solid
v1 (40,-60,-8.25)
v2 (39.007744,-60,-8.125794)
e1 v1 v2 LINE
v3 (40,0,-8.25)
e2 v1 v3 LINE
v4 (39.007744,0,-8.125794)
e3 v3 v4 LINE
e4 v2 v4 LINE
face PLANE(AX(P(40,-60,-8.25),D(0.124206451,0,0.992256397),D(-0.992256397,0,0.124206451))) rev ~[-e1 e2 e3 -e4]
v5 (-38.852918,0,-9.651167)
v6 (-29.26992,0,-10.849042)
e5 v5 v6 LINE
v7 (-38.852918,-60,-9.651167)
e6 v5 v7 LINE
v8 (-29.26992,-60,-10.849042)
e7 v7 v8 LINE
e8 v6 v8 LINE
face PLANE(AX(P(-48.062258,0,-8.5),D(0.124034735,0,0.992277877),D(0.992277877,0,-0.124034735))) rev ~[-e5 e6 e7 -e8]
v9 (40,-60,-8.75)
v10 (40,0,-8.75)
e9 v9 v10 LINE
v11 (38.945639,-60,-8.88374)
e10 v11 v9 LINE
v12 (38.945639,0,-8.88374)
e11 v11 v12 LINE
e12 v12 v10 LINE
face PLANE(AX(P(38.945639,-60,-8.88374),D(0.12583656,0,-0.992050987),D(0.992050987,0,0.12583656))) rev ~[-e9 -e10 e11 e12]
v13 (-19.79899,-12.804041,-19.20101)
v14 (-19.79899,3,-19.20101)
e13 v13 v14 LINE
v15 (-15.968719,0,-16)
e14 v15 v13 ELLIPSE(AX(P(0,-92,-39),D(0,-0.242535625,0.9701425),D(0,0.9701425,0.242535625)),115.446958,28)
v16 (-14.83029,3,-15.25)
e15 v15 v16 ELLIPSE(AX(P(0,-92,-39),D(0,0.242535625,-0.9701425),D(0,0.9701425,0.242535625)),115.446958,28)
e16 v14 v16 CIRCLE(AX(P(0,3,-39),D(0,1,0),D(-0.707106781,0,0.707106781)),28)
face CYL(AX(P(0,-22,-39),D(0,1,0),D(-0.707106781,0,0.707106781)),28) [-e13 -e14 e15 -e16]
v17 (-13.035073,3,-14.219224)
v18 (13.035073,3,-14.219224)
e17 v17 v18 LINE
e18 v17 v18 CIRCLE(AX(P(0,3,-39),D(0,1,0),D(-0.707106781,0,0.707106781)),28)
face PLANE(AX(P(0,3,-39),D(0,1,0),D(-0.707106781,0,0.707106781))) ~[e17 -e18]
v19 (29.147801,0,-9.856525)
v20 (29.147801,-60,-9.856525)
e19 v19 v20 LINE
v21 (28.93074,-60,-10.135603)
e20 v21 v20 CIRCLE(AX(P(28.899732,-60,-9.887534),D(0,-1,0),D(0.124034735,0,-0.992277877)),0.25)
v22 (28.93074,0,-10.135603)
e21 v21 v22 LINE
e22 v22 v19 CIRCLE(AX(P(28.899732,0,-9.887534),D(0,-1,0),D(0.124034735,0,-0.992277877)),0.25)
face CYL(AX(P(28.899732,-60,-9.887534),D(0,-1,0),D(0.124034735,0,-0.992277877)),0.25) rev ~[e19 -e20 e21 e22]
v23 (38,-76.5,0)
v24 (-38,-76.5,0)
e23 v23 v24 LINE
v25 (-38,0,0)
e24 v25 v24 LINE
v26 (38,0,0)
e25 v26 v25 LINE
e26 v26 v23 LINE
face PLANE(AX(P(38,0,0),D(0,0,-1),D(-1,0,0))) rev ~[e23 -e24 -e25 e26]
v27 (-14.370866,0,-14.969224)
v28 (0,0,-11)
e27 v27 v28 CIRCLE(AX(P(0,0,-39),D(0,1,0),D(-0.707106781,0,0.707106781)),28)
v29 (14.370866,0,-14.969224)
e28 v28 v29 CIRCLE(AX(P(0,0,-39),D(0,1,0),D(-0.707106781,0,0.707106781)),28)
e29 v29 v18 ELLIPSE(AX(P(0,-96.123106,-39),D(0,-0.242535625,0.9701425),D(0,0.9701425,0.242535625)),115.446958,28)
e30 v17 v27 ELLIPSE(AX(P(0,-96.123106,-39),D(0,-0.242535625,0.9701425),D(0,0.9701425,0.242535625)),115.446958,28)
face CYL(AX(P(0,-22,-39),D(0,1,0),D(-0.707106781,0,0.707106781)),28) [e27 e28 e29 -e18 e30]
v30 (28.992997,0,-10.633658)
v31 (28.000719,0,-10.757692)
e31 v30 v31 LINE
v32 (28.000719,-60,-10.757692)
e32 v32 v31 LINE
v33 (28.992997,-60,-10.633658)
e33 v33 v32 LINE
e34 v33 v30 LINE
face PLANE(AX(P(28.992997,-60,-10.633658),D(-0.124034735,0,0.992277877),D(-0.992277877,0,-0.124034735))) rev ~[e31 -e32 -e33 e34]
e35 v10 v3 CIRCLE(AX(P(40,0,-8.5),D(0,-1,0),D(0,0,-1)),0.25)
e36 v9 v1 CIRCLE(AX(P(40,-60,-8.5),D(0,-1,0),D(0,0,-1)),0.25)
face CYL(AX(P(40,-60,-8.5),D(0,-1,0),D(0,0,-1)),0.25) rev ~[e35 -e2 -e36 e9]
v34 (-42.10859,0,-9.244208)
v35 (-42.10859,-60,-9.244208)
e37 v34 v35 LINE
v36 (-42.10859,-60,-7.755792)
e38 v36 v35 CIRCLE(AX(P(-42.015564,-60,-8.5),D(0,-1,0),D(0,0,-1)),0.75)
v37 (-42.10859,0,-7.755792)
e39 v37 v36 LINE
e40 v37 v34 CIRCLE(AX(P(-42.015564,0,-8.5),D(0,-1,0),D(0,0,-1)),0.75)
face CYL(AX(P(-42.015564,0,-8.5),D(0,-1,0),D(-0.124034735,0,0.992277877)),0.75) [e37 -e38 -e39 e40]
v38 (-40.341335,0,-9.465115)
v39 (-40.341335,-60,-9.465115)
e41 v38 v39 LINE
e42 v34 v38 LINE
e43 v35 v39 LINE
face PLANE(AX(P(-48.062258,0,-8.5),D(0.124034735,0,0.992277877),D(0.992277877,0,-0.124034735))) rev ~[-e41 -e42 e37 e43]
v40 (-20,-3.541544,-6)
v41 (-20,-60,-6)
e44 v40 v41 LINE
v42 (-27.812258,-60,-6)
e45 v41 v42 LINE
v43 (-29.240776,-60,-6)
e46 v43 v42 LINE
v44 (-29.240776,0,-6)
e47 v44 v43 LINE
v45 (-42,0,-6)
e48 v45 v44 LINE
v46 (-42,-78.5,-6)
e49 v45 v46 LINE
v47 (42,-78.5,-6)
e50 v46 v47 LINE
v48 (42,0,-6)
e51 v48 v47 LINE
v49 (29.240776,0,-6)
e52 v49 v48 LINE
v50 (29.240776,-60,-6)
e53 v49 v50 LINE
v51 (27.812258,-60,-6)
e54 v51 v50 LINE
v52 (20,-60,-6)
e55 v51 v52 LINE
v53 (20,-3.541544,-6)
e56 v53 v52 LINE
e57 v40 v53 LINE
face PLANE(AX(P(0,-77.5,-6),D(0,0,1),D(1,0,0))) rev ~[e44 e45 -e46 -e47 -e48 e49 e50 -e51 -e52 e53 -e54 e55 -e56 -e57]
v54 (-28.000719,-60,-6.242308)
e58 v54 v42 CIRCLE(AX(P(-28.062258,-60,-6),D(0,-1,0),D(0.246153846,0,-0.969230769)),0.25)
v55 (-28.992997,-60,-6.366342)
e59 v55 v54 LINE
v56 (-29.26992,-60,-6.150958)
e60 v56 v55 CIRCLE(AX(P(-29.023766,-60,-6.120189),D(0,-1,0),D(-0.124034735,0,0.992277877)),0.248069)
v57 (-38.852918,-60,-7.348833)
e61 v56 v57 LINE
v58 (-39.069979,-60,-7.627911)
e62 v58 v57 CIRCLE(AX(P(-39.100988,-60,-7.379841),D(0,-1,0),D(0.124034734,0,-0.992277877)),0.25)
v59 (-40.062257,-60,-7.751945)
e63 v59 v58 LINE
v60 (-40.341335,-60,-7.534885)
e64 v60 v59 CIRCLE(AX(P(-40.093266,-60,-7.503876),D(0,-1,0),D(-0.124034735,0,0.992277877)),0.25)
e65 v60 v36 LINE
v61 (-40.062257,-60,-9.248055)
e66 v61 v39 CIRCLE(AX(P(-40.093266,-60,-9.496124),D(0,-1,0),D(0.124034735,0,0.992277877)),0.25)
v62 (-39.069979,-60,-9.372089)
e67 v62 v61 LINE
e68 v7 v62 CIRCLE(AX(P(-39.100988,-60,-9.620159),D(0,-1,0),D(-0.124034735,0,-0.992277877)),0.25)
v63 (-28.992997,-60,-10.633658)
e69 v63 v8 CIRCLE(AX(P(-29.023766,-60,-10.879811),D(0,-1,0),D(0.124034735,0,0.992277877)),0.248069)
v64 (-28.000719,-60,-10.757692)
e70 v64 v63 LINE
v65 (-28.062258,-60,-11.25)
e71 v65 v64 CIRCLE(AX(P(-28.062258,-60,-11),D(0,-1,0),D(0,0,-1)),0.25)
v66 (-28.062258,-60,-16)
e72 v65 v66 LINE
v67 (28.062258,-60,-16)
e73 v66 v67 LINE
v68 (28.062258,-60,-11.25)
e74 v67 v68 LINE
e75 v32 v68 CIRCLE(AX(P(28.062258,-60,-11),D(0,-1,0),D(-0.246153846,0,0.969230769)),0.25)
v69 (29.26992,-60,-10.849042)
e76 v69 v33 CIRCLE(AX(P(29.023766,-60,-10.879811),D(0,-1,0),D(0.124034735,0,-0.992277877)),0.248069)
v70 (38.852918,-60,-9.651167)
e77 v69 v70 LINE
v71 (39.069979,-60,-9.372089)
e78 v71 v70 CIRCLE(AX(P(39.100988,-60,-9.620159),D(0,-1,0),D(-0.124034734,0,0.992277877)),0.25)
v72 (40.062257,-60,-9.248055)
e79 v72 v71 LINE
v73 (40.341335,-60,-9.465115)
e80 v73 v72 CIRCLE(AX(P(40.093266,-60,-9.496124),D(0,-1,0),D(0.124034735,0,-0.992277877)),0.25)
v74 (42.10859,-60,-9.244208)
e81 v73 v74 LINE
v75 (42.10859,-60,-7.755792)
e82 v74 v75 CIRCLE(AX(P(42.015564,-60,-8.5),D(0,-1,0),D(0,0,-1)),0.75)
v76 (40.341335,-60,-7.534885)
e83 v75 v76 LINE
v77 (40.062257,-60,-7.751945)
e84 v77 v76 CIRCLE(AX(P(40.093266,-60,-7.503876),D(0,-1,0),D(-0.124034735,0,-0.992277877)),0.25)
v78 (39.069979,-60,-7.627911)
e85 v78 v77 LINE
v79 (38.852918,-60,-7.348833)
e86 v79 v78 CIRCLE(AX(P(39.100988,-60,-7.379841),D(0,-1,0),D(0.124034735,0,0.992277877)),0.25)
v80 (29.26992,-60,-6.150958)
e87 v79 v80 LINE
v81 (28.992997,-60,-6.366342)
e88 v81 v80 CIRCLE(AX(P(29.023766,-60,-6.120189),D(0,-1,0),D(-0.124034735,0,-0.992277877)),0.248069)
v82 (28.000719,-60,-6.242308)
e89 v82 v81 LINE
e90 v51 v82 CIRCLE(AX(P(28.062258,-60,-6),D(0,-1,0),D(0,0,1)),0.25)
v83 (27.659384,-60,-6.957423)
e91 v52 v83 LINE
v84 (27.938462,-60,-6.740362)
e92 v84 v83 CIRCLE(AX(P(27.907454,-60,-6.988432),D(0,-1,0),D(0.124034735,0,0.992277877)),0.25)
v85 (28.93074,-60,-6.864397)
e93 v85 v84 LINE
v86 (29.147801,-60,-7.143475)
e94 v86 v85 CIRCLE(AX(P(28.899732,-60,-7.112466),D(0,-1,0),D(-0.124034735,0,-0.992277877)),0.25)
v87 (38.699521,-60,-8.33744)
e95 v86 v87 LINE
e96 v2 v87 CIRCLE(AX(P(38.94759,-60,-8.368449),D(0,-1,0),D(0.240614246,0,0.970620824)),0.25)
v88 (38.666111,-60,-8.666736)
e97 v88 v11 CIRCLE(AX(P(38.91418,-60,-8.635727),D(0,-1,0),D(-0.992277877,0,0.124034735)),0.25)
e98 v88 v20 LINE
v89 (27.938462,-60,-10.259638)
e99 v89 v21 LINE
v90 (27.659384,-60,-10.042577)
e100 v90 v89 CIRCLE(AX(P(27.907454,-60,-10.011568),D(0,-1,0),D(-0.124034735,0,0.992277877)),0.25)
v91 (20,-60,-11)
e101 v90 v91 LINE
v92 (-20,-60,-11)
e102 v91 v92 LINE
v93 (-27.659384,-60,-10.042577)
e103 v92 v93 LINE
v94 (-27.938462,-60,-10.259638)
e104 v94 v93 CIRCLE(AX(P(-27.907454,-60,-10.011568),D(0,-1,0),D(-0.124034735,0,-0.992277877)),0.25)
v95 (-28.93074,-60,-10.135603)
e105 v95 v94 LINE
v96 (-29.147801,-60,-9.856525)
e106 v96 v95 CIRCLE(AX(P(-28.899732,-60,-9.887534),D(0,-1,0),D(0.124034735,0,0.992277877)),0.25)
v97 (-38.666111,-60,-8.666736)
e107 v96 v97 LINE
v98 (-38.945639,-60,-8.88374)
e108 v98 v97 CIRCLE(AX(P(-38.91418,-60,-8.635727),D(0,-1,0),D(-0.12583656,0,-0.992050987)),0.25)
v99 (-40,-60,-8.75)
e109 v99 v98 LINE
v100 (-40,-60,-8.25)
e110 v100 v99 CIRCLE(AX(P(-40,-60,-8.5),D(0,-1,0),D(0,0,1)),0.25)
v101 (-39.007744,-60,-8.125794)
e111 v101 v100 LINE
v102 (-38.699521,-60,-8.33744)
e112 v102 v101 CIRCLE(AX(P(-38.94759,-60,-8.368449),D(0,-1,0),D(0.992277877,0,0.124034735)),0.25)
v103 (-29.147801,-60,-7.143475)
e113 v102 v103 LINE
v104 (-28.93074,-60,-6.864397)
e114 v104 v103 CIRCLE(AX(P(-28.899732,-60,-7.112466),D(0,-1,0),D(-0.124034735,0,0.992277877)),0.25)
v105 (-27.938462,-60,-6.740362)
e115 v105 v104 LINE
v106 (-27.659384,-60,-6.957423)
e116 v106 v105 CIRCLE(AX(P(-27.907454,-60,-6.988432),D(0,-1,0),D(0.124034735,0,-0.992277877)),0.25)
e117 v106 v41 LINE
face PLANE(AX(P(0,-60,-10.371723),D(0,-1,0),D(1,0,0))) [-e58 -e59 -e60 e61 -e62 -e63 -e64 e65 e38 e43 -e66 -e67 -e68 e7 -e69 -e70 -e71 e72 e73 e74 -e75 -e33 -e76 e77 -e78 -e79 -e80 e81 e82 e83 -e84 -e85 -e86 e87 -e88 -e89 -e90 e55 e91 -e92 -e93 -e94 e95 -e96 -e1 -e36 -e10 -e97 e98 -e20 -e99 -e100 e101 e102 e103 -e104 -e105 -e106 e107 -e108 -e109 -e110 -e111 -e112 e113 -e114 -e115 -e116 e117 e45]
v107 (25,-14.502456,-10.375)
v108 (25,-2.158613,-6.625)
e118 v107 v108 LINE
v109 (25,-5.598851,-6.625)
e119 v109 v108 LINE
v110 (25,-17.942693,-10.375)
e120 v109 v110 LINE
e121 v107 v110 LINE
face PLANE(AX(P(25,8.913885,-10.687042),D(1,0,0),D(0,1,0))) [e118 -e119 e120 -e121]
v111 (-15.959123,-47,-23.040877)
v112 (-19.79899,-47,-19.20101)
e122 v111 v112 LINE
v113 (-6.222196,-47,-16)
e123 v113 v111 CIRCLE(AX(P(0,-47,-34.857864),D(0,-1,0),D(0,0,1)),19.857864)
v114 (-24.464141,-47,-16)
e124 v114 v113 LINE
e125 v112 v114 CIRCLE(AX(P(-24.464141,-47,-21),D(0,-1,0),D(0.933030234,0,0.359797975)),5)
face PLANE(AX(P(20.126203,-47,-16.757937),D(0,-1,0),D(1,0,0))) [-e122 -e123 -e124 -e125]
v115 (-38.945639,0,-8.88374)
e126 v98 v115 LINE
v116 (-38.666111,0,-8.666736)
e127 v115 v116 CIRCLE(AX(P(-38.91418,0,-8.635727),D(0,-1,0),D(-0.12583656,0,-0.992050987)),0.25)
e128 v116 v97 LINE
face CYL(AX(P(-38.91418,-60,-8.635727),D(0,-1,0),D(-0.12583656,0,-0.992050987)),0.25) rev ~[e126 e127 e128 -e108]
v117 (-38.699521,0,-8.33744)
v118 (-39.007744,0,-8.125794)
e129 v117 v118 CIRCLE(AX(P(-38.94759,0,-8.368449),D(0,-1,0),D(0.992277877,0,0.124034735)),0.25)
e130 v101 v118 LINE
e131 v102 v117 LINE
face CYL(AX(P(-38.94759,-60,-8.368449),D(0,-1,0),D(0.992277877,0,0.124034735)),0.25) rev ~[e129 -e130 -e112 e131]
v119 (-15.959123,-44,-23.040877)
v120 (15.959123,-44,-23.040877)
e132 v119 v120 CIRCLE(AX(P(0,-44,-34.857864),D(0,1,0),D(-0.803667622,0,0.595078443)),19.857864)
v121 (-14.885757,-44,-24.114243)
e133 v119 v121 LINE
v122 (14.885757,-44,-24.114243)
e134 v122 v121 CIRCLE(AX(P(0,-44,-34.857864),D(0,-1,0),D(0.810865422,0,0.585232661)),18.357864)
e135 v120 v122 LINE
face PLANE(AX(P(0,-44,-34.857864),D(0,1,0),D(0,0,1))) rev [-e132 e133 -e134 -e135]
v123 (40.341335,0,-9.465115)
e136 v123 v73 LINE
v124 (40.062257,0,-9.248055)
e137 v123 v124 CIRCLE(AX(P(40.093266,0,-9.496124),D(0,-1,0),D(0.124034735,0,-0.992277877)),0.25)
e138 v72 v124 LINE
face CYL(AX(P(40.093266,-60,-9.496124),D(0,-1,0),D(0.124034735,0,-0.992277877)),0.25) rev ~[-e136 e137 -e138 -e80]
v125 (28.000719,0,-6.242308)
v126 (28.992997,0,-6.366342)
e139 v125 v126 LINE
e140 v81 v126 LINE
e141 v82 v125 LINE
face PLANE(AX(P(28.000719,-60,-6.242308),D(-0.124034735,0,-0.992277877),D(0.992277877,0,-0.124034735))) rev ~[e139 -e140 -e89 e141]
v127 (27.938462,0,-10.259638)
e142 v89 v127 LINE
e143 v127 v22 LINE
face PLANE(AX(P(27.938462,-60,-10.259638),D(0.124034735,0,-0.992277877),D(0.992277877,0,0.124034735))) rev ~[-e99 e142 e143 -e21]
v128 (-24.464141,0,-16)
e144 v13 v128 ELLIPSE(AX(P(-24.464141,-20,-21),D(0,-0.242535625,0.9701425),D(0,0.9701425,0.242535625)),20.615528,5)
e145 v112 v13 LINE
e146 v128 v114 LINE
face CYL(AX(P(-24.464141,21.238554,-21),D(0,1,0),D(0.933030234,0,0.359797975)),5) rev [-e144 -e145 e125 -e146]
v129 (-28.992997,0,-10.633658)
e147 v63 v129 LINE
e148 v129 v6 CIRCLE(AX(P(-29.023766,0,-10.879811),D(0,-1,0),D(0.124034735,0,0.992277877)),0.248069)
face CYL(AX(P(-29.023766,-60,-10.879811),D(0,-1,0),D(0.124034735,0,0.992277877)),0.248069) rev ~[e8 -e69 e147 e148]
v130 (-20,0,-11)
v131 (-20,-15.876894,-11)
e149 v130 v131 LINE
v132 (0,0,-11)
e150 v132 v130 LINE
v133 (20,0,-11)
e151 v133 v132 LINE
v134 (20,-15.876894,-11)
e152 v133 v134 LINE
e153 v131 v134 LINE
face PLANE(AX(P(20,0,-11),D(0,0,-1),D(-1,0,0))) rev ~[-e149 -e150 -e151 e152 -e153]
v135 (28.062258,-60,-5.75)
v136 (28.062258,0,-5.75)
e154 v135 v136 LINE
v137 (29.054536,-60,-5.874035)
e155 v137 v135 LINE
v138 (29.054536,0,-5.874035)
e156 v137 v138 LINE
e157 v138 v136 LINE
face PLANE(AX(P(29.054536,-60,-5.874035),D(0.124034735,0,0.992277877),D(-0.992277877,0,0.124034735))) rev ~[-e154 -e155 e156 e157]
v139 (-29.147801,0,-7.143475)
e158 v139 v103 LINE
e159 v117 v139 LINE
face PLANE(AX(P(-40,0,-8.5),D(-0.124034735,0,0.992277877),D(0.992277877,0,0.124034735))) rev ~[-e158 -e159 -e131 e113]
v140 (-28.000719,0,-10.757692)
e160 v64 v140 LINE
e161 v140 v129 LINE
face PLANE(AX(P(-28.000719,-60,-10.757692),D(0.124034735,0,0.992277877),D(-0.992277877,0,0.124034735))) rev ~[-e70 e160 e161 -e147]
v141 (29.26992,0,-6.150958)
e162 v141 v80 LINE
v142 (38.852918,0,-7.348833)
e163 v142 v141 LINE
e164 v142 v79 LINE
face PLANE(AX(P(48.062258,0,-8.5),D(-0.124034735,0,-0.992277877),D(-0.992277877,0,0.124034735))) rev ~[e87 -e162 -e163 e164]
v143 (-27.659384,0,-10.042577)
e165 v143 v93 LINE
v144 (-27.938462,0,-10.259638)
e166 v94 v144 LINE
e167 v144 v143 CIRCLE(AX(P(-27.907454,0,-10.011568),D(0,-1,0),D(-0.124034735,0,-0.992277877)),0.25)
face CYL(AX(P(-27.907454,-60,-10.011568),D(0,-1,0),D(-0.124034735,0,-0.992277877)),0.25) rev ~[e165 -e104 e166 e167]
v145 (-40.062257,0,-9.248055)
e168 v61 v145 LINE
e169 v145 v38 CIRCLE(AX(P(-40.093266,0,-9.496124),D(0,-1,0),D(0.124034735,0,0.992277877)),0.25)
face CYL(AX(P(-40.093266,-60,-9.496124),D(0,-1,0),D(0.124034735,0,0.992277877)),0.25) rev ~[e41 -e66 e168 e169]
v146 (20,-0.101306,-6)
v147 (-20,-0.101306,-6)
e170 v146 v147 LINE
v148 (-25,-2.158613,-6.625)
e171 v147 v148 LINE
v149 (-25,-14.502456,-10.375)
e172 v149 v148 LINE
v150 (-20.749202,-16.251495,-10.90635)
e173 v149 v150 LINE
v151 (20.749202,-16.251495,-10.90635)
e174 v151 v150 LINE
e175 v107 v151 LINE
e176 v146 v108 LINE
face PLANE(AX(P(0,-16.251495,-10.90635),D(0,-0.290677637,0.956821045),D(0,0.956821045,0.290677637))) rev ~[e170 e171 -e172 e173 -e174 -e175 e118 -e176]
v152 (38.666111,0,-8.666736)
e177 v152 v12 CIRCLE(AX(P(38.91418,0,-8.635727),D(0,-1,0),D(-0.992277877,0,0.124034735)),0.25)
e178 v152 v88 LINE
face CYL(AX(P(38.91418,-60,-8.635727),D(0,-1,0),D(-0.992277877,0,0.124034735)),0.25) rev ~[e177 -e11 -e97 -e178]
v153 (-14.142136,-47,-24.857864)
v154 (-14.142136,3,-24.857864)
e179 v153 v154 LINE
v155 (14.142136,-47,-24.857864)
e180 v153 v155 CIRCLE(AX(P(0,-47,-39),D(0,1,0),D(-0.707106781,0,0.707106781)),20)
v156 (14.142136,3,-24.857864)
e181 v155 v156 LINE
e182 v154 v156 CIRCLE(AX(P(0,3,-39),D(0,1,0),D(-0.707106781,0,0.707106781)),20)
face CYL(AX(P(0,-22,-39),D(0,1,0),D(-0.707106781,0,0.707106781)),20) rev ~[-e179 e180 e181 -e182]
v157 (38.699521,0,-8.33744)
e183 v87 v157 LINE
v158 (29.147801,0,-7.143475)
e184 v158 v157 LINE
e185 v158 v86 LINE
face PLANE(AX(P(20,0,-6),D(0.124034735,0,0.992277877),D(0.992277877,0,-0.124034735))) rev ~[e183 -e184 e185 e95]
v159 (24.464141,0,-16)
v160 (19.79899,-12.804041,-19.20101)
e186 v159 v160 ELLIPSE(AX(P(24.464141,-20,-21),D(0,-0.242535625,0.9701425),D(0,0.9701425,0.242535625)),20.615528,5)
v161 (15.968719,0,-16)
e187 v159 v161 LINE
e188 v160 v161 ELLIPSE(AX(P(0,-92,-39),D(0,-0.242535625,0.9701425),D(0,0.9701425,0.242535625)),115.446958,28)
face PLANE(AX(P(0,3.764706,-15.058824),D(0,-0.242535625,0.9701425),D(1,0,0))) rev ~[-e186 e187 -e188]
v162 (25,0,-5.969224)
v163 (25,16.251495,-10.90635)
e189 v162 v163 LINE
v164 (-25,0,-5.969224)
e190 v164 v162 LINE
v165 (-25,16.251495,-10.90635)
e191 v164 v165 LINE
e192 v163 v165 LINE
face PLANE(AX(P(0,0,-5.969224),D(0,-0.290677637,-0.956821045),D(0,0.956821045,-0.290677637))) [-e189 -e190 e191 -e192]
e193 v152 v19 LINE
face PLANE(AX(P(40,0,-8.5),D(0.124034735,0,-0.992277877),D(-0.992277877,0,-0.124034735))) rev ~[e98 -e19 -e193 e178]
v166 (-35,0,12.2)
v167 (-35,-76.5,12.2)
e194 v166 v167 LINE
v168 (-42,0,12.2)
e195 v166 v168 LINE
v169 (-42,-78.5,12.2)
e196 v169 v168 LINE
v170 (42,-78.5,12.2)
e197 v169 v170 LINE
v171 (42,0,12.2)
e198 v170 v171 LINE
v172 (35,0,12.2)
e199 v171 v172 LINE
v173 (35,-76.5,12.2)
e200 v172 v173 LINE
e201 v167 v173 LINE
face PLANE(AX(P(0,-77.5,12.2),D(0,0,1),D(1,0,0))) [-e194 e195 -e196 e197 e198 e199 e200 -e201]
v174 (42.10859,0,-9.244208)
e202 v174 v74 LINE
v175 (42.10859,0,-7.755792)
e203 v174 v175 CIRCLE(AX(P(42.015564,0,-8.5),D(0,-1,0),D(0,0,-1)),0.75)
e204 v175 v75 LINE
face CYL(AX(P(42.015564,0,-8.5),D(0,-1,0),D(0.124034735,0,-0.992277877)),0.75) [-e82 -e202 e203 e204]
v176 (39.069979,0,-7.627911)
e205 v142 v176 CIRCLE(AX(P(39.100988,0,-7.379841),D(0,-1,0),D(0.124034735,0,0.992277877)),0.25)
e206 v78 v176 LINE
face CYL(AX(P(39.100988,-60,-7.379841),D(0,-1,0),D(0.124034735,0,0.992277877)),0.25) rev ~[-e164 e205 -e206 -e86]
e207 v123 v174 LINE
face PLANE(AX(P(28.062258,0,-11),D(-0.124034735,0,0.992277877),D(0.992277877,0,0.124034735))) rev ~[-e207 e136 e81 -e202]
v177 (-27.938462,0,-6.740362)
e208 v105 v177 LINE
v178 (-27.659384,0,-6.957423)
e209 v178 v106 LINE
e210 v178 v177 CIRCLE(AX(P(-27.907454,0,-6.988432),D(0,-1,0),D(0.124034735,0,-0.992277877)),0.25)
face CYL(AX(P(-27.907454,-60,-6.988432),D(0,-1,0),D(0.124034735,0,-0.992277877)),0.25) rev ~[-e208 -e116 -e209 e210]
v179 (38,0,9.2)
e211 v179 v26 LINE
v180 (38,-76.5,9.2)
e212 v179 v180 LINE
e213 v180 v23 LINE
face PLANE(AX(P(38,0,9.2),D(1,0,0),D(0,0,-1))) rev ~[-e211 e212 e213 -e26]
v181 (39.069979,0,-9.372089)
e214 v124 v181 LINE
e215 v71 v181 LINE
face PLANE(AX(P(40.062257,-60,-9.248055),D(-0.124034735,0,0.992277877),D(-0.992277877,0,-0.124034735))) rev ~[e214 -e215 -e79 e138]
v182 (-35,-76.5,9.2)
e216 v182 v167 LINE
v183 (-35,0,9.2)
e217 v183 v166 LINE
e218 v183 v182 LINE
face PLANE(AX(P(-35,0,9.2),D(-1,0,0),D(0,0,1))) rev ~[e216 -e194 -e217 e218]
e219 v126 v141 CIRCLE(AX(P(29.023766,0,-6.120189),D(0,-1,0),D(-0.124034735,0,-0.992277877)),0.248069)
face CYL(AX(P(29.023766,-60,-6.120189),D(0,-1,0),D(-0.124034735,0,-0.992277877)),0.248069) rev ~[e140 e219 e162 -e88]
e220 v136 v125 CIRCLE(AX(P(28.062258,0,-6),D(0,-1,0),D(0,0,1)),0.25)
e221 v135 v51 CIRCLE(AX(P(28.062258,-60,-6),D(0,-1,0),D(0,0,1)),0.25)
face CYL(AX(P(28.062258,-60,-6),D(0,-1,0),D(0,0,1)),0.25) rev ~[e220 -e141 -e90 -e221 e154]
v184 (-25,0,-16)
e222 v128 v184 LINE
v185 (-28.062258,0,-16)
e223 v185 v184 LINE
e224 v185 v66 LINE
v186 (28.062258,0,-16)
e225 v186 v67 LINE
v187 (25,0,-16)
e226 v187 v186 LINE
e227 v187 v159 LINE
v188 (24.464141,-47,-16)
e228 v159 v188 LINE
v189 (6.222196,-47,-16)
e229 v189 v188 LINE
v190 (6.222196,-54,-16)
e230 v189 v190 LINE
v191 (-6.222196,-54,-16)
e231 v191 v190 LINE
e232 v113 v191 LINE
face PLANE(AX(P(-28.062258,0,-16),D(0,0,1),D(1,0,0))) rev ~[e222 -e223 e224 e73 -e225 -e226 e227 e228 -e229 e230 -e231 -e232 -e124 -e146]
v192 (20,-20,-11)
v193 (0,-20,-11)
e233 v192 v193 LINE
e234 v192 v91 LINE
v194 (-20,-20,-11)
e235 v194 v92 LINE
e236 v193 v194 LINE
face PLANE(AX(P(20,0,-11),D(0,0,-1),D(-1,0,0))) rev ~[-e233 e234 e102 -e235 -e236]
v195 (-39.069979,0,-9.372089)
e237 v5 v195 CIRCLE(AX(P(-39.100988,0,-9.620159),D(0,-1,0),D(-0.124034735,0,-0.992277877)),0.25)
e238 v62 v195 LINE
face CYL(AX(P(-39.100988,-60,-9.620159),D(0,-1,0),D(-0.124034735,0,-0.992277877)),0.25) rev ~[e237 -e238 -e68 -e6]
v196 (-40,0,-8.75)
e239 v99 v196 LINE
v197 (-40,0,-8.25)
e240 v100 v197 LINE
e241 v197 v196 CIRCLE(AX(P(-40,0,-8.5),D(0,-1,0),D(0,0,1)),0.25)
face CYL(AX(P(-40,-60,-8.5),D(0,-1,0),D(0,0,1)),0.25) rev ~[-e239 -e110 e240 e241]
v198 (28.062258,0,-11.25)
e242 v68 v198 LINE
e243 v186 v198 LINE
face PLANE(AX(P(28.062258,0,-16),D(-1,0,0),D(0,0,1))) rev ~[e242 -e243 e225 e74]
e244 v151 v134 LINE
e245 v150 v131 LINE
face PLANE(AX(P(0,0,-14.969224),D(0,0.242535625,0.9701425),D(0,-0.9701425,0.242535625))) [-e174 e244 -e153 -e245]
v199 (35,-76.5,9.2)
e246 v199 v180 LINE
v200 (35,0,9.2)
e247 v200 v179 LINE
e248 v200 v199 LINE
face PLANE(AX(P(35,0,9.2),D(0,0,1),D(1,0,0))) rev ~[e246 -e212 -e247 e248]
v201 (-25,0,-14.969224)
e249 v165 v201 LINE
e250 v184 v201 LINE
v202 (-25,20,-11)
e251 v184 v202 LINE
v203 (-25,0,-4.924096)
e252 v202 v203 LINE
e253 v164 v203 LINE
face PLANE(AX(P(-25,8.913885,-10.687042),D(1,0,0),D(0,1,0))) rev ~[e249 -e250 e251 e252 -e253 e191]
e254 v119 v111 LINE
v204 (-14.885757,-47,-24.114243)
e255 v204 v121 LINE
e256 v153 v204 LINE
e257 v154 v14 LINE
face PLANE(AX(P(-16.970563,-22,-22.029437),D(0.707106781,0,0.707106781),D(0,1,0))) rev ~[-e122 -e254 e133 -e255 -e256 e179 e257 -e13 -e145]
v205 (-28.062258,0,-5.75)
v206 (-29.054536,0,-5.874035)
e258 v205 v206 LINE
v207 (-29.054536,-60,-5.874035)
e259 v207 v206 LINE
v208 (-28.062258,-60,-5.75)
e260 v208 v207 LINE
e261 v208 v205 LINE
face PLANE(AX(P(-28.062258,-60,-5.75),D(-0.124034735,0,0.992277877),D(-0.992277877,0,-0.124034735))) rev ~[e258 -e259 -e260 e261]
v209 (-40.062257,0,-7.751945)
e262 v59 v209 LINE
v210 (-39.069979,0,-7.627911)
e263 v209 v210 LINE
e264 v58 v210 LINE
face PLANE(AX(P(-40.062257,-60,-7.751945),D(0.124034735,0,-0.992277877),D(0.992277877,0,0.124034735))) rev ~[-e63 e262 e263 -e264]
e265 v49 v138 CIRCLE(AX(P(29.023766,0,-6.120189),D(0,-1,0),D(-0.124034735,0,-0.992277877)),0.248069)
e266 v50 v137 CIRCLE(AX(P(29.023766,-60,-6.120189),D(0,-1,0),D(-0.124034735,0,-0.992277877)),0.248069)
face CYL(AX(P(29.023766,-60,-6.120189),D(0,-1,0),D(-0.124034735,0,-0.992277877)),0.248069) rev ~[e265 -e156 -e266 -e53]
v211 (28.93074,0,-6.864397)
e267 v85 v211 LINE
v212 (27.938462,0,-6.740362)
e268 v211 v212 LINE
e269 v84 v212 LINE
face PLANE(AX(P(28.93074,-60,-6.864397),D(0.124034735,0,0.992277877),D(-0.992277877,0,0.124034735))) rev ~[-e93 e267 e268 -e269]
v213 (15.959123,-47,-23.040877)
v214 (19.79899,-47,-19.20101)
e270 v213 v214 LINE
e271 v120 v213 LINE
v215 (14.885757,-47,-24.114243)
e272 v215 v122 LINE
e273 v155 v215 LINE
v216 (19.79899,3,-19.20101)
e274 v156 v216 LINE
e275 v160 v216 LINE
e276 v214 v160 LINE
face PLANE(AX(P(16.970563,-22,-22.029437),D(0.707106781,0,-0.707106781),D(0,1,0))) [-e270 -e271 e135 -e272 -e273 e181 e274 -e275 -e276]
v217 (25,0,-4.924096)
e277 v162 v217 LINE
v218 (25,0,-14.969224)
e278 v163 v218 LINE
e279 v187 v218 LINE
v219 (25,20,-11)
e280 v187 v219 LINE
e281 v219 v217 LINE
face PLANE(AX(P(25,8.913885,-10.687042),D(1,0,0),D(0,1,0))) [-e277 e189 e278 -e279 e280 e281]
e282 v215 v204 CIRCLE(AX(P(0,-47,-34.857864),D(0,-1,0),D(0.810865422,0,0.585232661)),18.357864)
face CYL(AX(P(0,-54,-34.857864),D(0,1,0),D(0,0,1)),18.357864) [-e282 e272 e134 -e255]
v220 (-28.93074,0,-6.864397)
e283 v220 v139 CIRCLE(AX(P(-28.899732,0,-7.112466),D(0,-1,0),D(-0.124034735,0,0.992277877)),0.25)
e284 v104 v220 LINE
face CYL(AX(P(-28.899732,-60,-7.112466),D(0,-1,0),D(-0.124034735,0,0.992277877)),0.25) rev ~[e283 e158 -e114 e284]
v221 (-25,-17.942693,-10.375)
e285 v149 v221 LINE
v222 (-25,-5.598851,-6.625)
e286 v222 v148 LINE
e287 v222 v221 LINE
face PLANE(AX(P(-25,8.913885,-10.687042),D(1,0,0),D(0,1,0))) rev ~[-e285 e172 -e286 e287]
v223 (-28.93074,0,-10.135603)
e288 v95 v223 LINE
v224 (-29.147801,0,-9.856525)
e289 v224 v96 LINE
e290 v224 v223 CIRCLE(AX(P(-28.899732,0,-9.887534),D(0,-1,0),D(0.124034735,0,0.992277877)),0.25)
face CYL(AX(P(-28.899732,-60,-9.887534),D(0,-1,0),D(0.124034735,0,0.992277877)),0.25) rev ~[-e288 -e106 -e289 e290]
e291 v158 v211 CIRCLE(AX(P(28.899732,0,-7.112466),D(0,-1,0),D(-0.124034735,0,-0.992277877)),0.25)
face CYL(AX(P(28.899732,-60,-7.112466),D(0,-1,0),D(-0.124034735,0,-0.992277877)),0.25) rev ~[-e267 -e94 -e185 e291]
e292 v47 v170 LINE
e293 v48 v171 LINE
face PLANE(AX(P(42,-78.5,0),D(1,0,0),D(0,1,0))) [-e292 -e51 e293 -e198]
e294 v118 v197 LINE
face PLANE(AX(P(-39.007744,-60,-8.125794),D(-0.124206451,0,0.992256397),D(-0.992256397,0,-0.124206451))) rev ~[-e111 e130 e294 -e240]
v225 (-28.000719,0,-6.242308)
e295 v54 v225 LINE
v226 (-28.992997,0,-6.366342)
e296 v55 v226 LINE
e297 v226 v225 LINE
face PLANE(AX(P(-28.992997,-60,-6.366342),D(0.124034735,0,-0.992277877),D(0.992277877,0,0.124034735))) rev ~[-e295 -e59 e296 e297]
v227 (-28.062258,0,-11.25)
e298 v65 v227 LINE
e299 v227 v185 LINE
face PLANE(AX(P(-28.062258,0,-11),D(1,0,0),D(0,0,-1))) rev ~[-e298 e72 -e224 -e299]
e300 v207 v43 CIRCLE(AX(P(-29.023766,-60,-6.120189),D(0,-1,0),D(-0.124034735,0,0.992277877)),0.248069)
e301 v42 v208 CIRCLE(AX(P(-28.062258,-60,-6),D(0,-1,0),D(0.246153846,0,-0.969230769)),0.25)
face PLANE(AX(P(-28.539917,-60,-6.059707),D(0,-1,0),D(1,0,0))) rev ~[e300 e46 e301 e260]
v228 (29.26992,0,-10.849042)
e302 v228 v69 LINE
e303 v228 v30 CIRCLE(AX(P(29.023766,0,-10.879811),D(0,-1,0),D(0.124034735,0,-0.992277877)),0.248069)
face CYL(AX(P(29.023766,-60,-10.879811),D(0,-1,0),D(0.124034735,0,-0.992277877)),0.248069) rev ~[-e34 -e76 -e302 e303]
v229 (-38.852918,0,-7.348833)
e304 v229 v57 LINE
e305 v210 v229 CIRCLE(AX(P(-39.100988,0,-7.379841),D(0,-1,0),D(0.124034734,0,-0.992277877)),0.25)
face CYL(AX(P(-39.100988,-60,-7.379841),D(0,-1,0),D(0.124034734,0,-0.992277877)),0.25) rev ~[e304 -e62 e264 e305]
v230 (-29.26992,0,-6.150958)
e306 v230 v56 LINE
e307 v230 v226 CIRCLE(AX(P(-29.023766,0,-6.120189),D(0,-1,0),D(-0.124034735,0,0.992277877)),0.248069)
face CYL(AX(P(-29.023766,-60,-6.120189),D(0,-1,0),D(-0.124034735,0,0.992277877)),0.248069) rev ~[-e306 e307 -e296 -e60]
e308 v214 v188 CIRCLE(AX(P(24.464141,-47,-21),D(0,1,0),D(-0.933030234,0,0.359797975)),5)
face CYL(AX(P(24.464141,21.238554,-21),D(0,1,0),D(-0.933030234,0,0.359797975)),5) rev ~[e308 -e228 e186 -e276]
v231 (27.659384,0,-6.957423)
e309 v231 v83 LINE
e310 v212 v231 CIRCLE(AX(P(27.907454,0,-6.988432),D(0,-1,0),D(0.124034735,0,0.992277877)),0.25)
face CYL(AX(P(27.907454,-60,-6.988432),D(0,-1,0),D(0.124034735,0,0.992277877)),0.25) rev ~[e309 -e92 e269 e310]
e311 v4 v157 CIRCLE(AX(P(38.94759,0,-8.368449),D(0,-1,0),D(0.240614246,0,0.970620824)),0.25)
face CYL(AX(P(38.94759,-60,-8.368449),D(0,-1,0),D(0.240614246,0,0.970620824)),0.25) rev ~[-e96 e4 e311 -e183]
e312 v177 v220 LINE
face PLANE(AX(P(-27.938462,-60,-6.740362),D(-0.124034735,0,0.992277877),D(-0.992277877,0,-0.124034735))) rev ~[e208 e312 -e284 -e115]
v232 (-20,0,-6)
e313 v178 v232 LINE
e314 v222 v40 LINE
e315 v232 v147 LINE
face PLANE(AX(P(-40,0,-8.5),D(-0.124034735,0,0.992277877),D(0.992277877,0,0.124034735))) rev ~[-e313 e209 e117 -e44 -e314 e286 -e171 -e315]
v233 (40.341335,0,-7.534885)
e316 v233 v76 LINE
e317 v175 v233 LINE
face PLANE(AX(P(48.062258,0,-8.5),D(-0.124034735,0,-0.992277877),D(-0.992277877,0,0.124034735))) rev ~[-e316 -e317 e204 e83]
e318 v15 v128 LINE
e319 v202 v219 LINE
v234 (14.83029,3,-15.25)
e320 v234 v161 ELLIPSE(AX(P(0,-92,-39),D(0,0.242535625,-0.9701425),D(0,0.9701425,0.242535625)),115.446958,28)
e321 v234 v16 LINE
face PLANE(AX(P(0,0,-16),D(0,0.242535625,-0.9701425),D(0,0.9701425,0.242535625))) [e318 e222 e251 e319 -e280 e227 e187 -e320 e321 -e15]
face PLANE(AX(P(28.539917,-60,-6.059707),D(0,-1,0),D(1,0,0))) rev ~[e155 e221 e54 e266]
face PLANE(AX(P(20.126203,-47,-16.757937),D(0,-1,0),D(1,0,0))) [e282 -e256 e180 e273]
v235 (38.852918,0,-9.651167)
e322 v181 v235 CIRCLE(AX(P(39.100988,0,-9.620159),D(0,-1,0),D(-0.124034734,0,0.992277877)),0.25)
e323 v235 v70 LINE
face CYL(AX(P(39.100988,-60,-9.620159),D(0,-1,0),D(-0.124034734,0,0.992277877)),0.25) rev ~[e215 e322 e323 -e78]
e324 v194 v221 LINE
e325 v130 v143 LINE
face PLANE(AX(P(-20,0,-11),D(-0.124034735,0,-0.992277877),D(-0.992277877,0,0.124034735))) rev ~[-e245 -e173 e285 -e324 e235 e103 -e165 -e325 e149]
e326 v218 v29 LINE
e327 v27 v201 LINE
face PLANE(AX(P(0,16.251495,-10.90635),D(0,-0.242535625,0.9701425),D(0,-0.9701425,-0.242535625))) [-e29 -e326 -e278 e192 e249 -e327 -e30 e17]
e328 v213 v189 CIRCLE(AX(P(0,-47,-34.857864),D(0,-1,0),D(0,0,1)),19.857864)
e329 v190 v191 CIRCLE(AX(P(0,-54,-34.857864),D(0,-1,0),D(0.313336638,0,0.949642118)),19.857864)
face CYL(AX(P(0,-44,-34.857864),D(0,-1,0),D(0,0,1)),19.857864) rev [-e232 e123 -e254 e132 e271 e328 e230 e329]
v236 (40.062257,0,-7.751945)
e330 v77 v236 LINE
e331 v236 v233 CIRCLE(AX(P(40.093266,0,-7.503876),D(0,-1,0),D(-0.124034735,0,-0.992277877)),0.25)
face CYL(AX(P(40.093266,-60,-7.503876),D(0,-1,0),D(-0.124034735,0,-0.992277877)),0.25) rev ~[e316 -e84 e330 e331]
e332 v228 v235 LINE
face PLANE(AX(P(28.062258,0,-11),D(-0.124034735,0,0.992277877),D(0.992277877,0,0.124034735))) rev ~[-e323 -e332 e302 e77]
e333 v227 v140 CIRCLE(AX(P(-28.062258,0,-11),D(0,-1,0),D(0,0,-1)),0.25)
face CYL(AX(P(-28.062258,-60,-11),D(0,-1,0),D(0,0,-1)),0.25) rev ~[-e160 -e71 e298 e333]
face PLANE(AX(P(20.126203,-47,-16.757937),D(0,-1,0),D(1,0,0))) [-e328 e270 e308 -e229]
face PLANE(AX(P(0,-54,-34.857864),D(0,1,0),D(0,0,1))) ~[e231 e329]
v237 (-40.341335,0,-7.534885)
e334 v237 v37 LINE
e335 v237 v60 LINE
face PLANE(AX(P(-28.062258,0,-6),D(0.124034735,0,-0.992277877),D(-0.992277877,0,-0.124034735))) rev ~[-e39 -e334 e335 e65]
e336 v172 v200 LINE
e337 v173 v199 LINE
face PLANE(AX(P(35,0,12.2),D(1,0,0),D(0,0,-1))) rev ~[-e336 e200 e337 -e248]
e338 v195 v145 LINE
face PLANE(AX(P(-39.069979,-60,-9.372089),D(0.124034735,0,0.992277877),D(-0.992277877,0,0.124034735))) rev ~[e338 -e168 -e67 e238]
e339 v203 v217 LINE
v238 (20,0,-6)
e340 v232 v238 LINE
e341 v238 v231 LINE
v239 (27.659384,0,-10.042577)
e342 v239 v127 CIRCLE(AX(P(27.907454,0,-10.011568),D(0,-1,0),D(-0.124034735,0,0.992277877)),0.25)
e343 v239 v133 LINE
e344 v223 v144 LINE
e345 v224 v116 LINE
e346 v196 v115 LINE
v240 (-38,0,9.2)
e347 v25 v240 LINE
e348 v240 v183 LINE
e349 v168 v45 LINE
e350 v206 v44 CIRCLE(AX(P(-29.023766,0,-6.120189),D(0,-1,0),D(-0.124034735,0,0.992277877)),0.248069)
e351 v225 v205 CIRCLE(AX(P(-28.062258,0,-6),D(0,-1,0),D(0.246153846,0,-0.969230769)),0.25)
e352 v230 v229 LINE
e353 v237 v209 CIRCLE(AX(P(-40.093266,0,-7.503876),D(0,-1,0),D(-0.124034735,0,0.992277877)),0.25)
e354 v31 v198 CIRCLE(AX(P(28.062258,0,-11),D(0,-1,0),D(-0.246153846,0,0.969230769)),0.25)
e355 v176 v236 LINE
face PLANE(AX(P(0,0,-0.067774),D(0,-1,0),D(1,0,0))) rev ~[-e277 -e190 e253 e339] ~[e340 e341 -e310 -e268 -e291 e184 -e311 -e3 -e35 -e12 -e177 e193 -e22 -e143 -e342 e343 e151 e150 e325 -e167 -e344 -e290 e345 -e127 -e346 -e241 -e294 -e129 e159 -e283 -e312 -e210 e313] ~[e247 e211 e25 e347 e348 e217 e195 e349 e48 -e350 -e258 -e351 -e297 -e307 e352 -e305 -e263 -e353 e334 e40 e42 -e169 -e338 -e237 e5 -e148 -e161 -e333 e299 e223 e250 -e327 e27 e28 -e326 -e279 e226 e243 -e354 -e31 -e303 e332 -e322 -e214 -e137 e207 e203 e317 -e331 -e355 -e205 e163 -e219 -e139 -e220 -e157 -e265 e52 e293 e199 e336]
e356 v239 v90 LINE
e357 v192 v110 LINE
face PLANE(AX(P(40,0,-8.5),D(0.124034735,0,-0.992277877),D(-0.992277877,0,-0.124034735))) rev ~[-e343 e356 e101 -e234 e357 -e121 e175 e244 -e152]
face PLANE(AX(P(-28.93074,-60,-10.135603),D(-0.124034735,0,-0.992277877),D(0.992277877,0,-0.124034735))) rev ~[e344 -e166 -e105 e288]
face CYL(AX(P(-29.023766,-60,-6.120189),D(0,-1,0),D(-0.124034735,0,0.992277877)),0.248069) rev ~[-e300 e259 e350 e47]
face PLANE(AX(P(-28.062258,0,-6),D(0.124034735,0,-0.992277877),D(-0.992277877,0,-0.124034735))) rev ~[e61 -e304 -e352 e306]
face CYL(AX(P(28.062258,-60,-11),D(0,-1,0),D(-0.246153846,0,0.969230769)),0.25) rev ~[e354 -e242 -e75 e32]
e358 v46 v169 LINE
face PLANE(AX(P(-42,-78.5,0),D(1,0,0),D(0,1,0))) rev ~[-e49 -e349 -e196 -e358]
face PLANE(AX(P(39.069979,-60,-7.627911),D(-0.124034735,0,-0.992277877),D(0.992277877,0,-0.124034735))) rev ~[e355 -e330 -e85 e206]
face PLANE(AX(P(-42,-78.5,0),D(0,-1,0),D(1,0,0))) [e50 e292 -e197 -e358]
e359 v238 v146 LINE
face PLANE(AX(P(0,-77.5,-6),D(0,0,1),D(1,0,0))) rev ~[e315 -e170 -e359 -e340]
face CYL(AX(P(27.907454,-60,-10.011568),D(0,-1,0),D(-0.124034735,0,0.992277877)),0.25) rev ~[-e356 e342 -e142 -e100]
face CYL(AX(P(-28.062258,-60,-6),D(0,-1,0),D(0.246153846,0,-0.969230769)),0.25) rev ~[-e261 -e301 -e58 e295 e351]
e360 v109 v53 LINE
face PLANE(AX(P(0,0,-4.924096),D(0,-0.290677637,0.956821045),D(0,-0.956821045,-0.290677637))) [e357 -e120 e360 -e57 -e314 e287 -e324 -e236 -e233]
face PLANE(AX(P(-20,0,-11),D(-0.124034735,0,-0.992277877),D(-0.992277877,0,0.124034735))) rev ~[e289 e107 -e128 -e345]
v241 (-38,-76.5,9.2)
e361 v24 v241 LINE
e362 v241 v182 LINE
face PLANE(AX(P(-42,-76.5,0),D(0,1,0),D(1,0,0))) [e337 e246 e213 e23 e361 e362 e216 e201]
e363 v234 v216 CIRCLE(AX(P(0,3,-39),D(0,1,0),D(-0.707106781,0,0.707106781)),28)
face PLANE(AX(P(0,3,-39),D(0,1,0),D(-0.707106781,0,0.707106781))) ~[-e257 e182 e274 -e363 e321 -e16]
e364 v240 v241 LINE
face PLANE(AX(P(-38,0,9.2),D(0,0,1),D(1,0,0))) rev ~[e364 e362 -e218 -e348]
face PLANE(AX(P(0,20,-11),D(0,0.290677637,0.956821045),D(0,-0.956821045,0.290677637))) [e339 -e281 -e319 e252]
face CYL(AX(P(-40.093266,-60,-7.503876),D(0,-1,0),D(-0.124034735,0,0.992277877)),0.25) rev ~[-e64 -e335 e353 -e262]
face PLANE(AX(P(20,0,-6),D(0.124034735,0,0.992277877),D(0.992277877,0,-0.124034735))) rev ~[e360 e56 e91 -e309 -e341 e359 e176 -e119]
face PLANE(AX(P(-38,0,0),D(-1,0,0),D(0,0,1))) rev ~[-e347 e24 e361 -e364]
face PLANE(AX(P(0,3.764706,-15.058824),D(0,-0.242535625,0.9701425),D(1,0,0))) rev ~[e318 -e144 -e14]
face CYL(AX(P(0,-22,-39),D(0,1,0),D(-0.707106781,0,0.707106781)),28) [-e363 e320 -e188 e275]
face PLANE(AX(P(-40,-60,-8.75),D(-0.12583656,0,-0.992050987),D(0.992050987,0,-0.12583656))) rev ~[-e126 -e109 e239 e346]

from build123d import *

# Parameters (mm, degrees)
F1_DEPTH      = 76.5
F3_DEPTH      = 60
F4_W          = 84
F4_H          = 2
F5_DEPTH      = 12.2
F5_DEPTH_BACK = 6
F7_DEPTH      = 25
F7_DEPTH_BACK = 25
F8_W          = 50
F8_H          = 8
F9_ANGLE_BACK = 45
F9_ANGLE      = 90
F10_T4_DEPTH  = 68.2385540506
F10_T9_DEPTH  = 68.2385540506
F11_W         = 5
F11_H         = 1.5
F14_DEPTH     = 60
F15_F1_R      = 0.75
F15_F2_R      = 0.75


# Not quite as in the source:
# - a fillet or chamfer that OpenCascade refuses, or shapes differently, is made with other operations: its cross-section is extruded or revolved along the edge and cut away or added


with BuildPart() as f1:
    # F0 (on Front) → F1 (new body)
    with BuildSketch(Plane.XZ):
        Polygon((-35, 9.2), (-35, 12.2), (-42, 12.2), (-42, -6), (0, -6), (42, -6), (42, 12.2), (35, 12.2), (35, 9.2), (38, 9.2), (38, 0), (0, 0), (-38, 0), (-38, 9.2), align=None)
    extrude(amount=F1_DEPTH)

    # F2 (on Front) → F3 (join)
    with BuildSketch(Plane.XZ):
        Polygon((-40, -8.5), (-20, -6), (-28.0622577483, -6), (-48.0622577483, -8.5), (-28.0622577483, -11), (-28.0622577483, -16), (0, -16), (28.0622577483, -16), (28.0622577483, -11), (48.0622577483, -8.5), (28.0622577483, -6), (20, -6), (40, -8.5), (20, -11), (0, -11), (-20, -11), align=None)
    extrude(amount=F3_DEPTH)

    # F4 (on face) → F5 (join, two sides)
    with BuildSketch(Plane.XY) as f5_sk:
        with Locations((0, -77.5)):
            Rectangle(F4_W, F4_H)
    extrude(amount=F5_DEPTH)
    extrude(f5_sk.sketch, amount=-F5_DEPTH_BACK)

    # F6 (on Right) → F7 (join, two sides)
    with BuildSketch(Plane.YZ) as f7_sk:
        Polygon((0, -14.9692235936), (0, -16), (20, -11), (0, -4.9240960793), (0, -5.9692235936), (16.2514952539, -10.9063497801), align=None)
        Polygon((-20, -11), (0, -16), (0, -14.9692235936), (-16.2514952539, -10.9063497801), (0, -5.9692235936), (0, -4.9240960793), align=None)
    extrude(amount=F7_DEPTH)
    extrude(f7_sk.sketch, amount=-F7_DEPTH_BACK)

    # F8 (on Right) → F9 (revolve)
    with BuildSketch(Plane.YZ, mode=Mode.PRIVATE) as f9_sk:
        with Locations((-22, -15)):
            Rectangle(F8_W, F8_H)
    revolve(f9_sk.sketch.rotate(Axis((0, -22, -39), (0, 1, 0)), -F9_ANGLE_BACK), axis=Axis((0, -22, -39), (0, 1, 0)), revolution_arc=F9_ANGLE)

    # F10: fillet of radius 5 on 2 edges, made by hand


with BuildPart() as f10_tool2:
    # F10_s3 → F10_t4 (new body)
    with BuildSketch(Plane.XZ.offset(-21.2385540506)):
        with BuildLine():
            ThreePointArc((-19.7989898732, -19.2010101268), (-21.6352675362, -16.8772006254), (-24.4641410429, -16))
            Line((-24.4641410429, -16), (-15.9687194227, -16))
            ThreePointArc((-15.9687194227, -16), (-17.9553299476, -17.5149790209), (-19.7989898732, -19.2010101268))
        make_face()
    extrude(amount=F10_T4_DEPTH)

    split(bisect_by=Plane(origin=(0, 3.7647058824, -15.0588235294), x_dir=(1, 0, 0), z_dir=(0, -0.242535625, 0.9701425001)), keep=Keep.TOP)


with BuildPart() as f1_1:
    add(f1.part)

    # F10_t1: union F10_tool2
    add(f10_tool2.part)


with BuildPart() as f10_tool7:
    # F10_s8 → F10_t9 (new body)
    with BuildSketch(Plane.XZ.offset(-21.2385540506)):
        with BuildLine():
            ThreePointArc((19.7989898732, -19.2010101268), (21.6352675362, -16.8772006254), (24.4641410429, -16))
            Line((24.4641410429, -16), (15.9687194227, -16))
            ThreePointArc((15.9687194227, -16), (17.9553299476, -17.5149790209), (19.7989898732, -19.2010101268))
        make_face()
    extrude(amount=F10_T9_DEPTH)

    split(bisect_by=Plane(origin=(0, 3.7647058824, -15.0588235294), x_dir=(1, 0, 0), z_dir=(0, -0.242535625, 0.9701425001)), keep=Keep.TOP)


with BuildPart() as f1_2:
    add(f1_1.part)

    # F10_t6: union F10_tool7
    add(f10_tool7.part)

    # F11 (on Right) → F12 (revolve, cut)
    with BuildSketch(Plane.YZ):
        with Locations((-51.5, -15.75)):
            Rectangle(F11_W, F11_H)
        with Locations((-46.5, -15.75)):
            Rectangle(F11_W, F11_H)
    revolve(axis=Axis((0, -22, -34.8578643763), (0, 1, 0)), mode=Mode.SUBTRACT)

    # F13 (on face) → F14 (cut, through all)
    with BuildSketch(Plane.XZ.offset(60)):
        with BuildLine():
            Line((38.9456393414, -8.8837402215), (40, -8.75))
            ThreePointArc((40, -8.75), (40.25, -8.5), (40, -8.25))
            Line((40, -8.25), (39.0077436029, -8.1257935491))
            ThreePointArc((39.0077436029, -8.1257935491), (38.8060744602, -8.1623581433), (38.6995205721, -8.3374400715))
            Line((38.6995205721, -8.3374400715), (38.6661107322, -8.6047187912))
            ThreePointArc((38.6661107322, -8.6047187912), (38.737564097, -8.8126646153), (38.9456393414, -8.8837402215))
        make_face()
        with BuildLine():
            Line((39.0699789435, -7.627910704), (40.0622568202, -7.7519454386))
            ThreePointArc((40.0622568202, -7.7519454386), (40.341334973, -7.5348846531), (40.1242741875, -7.2558065003))
            Line((40.1242741875, -7.2558065003), (39.1319963108, -7.1317717657))
            ThreePointArc((39.1319963108, -7.1317717657), (38.8529181579, -7.3488325512), (39.0699789435, -7.627910704))
        make_face()
        with BuildLine():
            Line((29.054535625, -5.8740347346), (28.0622577483, -5.75))
            ThreePointArc((28.0622577483, -5.75), (27.8141882791, -5.9689913164), (28.0007192868, -6.2423076923))
            Line((28.0007192868, -6.2423076923), (28.9929971635, -6.3663424269))
            ThreePointArc((28.9929971635, -6.3663424269), (29.2699202404, -6.1509578115), (29.054535625, -5.8740347346))
        make_face()
        with BuildLine():
            Line((28.9307403433, -6.8643969883), (27.9384624666, -6.7403622537))
            ThreePointArc((27.9384624666, -6.7403622537), (27.6593843138, -6.9574230392), (27.8764450993, -7.236501192))
            Line((27.8764450993, -7.236501192), (28.868722976, -7.3605359266))
            ThreePointArc((28.868722976, -7.3605359266), (29.1478011288, -7.1434751411), (28.9307403433, -6.8643969883))
        make_face()
        with BuildLine():
            ThreePointArc((39.0699789435, -9.372089296), (38.8529181579, -9.6511674488), (39.1319963108, -9.8682282343))
            Line((39.1319963108, -9.8682282343), (40.1242741875, -9.7441934997))
            ThreePointArc((40.1242741875, -9.7441934997), (40.341334973, -9.4651153469), (40.0622568202, -9.2480545614))
            Line((40.0622568202, -9.2480545614), (39.0699789435, -9.372089296))
        make_face()
        with BuildLine():
            Line((27.9384624666, -10.2596377463), (28.9307403433, -10.1356030117))
            ThreePointArc((28.9307403433, -10.1356030117), (29.1478011288, -9.8565248589), (28.868722976, -9.6394640734))
            Line((28.868722976, -9.6394640734), (27.8764450993, -9.763498808))
            ThreePointArc((27.8764450993, -9.763498808), (27.6593843138, -10.0425769608), (27.9384624666, -10.2596377463))
        make_face()
        with BuildLine():
            ThreePointArc((28.0007192868, -10.7576923077), (27.8141882791, -11.0310086836), (28.0622577483, -11.25))
            Line((28.0622577483, -11.25), (29.054535625, -11.1259652654))
            ThreePointArc((29.054535625, -11.1259652654), (29.2699202404, -10.8490421885), (28.9929971635, -10.6336575731))
            Line((28.9929971635, -10.6336575731), (28.0007192868, -10.7576923077))
        make_face()
        with BuildLine():
            Line((-38.6661107322, -8.6047187912), (-38.6995205721, -8.3374400715))
            ThreePointArc((-38.6995205721, -8.3374400715), (-38.8060744602, -8.1623581433), (-39.0077436029, -8.1257935491))
            Line((-39.0077436029, -8.1257935491), (-40, -8.25))
            ThreePointArc((-40, -8.25), (-40.25, -8.5), (-40, -8.75))
            Line((-40, -8.75), (-38.9456393414, -8.8837402215))
            ThreePointArc((-38.9456393414, -8.8837402215), (-38.737564097, -8.8126646153), (-38.6661107322, -8.6047187912))
        make_face()
        with BuildLine():
            Line((-40.0622568202, -7.7519454386), (-39.0699789435, -7.627910704))
            ThreePointArc((-39.0699789435, -7.627910704), (-38.8529181579, -7.3488325512), (-39.1319963108, -7.1317717657))
            Line((-39.1319963108, -7.1317717657), (-40.1242741875, -7.2558065003))
            ThreePointArc((-40.1242741875, -7.2558065003), (-40.341334973, -7.5348846531), (-40.0622568202, -7.7519454386))
        make_face()
        with BuildLine():
            ThreePointArc((-39.1319963108, -9.8682282343), (-38.8529181579, -9.6511674488), (-39.0699789435, -9.372089296))
            Line((-39.0699789435, -9.372089296), (-40.0622568202, -9.2480545614))
            ThreePointArc((-40.0622568202, -9.2480545614), (-40.341334973, -9.4651153469), (-40.1242741875, -9.7441934997))
            Line((-40.1242741875, -9.7441934997), (-39.1319963108, -9.8682282343))
        make_face()
        with BuildLine():
            ThreePointArc((-28.0007192868, -6.2423076923), (-27.8141882791, -5.9689913164), (-28.0622577483, -5.75))
            Line((-28.0622577483, -5.75), (-29.054535625, -5.8740347346))
            ThreePointArc((-29.054535625, -5.8740347346), (-29.2699202404, -6.1509578115), (-28.9929971635, -6.3663424269))
            Line((-28.9929971635, -6.3663424269), (-28.0007192868, -6.2423076923))
        make_face()
        with BuildLine():
            ThreePointArc((-27.9384624666, -10.2596377463), (-27.6593843138, -10.0425769608), (-27.8764450993, -9.763498808))
            Line((-27.8764450993, -9.763498808), (-28.868722976, -9.6394640734))
            ThreePointArc((-28.868722976, -9.6394640734), (-29.1478011288, -9.8565248589), (-28.9307403433, -10.1356030117))
            Line((-28.9307403433, -10.1356030117), (-27.9384624666, -10.2596377463))
        make_face()
        with BuildLine():
            ThreePointArc((-28.0622577483, -11.25), (-27.8141882791, -11.0310086836), (-28.0007192868, -10.7576923077))
            Line((-28.0007192868, -10.7576923077), (-28.9929971635, -10.6336575731))
            ThreePointArc((-28.9929971635, -10.6336575731), (-29.2699202404, -10.8490421885), (-29.054535625, -11.1259652654))
            Line((-29.054535625, -11.1259652654), (-28.0622577483, -11.25))
        make_face()
        with BuildLine():
            ThreePointArc((-27.8764450993, -7.236501192), (-27.6593843138, -6.9574230392), (-27.9384624666, -6.7403622537))
            Line((-27.9384624666, -6.7403622537), (-28.9307403433, -6.8643969883))
            ThreePointArc((-28.9307403433, -6.8643969883), (-29.1478011288, -7.1434751411), (-28.868722976, -7.3605359266))
            Line((-28.868722976, -7.3605359266), (-27.8764450993, -7.236501192))
        make_face()
    extrude(amount=-F14_DEPTH, mode=Mode.SUBTRACT)

    # F15: fillet of radius 0.75 on 2 edges, made by hand

    # F15_f1
    f15_f1_edges = [f1_2.edges().sort_by_distance(p)[0] for p in [
        (-48.0622577483, -30, -8.5),
    ]]
    fillet(f15_f1_edges, radius=F15_F1_R)

    # F15_f2
    f15_f2_edges = [f1_2.edges().sort_by_distance(p)[0] for p in [
        (48.0622577483, -30, -8.5),
    ]]
    fillet(f15_f2_edges, radius=F15_F2_R)


solid = f1_2.part
